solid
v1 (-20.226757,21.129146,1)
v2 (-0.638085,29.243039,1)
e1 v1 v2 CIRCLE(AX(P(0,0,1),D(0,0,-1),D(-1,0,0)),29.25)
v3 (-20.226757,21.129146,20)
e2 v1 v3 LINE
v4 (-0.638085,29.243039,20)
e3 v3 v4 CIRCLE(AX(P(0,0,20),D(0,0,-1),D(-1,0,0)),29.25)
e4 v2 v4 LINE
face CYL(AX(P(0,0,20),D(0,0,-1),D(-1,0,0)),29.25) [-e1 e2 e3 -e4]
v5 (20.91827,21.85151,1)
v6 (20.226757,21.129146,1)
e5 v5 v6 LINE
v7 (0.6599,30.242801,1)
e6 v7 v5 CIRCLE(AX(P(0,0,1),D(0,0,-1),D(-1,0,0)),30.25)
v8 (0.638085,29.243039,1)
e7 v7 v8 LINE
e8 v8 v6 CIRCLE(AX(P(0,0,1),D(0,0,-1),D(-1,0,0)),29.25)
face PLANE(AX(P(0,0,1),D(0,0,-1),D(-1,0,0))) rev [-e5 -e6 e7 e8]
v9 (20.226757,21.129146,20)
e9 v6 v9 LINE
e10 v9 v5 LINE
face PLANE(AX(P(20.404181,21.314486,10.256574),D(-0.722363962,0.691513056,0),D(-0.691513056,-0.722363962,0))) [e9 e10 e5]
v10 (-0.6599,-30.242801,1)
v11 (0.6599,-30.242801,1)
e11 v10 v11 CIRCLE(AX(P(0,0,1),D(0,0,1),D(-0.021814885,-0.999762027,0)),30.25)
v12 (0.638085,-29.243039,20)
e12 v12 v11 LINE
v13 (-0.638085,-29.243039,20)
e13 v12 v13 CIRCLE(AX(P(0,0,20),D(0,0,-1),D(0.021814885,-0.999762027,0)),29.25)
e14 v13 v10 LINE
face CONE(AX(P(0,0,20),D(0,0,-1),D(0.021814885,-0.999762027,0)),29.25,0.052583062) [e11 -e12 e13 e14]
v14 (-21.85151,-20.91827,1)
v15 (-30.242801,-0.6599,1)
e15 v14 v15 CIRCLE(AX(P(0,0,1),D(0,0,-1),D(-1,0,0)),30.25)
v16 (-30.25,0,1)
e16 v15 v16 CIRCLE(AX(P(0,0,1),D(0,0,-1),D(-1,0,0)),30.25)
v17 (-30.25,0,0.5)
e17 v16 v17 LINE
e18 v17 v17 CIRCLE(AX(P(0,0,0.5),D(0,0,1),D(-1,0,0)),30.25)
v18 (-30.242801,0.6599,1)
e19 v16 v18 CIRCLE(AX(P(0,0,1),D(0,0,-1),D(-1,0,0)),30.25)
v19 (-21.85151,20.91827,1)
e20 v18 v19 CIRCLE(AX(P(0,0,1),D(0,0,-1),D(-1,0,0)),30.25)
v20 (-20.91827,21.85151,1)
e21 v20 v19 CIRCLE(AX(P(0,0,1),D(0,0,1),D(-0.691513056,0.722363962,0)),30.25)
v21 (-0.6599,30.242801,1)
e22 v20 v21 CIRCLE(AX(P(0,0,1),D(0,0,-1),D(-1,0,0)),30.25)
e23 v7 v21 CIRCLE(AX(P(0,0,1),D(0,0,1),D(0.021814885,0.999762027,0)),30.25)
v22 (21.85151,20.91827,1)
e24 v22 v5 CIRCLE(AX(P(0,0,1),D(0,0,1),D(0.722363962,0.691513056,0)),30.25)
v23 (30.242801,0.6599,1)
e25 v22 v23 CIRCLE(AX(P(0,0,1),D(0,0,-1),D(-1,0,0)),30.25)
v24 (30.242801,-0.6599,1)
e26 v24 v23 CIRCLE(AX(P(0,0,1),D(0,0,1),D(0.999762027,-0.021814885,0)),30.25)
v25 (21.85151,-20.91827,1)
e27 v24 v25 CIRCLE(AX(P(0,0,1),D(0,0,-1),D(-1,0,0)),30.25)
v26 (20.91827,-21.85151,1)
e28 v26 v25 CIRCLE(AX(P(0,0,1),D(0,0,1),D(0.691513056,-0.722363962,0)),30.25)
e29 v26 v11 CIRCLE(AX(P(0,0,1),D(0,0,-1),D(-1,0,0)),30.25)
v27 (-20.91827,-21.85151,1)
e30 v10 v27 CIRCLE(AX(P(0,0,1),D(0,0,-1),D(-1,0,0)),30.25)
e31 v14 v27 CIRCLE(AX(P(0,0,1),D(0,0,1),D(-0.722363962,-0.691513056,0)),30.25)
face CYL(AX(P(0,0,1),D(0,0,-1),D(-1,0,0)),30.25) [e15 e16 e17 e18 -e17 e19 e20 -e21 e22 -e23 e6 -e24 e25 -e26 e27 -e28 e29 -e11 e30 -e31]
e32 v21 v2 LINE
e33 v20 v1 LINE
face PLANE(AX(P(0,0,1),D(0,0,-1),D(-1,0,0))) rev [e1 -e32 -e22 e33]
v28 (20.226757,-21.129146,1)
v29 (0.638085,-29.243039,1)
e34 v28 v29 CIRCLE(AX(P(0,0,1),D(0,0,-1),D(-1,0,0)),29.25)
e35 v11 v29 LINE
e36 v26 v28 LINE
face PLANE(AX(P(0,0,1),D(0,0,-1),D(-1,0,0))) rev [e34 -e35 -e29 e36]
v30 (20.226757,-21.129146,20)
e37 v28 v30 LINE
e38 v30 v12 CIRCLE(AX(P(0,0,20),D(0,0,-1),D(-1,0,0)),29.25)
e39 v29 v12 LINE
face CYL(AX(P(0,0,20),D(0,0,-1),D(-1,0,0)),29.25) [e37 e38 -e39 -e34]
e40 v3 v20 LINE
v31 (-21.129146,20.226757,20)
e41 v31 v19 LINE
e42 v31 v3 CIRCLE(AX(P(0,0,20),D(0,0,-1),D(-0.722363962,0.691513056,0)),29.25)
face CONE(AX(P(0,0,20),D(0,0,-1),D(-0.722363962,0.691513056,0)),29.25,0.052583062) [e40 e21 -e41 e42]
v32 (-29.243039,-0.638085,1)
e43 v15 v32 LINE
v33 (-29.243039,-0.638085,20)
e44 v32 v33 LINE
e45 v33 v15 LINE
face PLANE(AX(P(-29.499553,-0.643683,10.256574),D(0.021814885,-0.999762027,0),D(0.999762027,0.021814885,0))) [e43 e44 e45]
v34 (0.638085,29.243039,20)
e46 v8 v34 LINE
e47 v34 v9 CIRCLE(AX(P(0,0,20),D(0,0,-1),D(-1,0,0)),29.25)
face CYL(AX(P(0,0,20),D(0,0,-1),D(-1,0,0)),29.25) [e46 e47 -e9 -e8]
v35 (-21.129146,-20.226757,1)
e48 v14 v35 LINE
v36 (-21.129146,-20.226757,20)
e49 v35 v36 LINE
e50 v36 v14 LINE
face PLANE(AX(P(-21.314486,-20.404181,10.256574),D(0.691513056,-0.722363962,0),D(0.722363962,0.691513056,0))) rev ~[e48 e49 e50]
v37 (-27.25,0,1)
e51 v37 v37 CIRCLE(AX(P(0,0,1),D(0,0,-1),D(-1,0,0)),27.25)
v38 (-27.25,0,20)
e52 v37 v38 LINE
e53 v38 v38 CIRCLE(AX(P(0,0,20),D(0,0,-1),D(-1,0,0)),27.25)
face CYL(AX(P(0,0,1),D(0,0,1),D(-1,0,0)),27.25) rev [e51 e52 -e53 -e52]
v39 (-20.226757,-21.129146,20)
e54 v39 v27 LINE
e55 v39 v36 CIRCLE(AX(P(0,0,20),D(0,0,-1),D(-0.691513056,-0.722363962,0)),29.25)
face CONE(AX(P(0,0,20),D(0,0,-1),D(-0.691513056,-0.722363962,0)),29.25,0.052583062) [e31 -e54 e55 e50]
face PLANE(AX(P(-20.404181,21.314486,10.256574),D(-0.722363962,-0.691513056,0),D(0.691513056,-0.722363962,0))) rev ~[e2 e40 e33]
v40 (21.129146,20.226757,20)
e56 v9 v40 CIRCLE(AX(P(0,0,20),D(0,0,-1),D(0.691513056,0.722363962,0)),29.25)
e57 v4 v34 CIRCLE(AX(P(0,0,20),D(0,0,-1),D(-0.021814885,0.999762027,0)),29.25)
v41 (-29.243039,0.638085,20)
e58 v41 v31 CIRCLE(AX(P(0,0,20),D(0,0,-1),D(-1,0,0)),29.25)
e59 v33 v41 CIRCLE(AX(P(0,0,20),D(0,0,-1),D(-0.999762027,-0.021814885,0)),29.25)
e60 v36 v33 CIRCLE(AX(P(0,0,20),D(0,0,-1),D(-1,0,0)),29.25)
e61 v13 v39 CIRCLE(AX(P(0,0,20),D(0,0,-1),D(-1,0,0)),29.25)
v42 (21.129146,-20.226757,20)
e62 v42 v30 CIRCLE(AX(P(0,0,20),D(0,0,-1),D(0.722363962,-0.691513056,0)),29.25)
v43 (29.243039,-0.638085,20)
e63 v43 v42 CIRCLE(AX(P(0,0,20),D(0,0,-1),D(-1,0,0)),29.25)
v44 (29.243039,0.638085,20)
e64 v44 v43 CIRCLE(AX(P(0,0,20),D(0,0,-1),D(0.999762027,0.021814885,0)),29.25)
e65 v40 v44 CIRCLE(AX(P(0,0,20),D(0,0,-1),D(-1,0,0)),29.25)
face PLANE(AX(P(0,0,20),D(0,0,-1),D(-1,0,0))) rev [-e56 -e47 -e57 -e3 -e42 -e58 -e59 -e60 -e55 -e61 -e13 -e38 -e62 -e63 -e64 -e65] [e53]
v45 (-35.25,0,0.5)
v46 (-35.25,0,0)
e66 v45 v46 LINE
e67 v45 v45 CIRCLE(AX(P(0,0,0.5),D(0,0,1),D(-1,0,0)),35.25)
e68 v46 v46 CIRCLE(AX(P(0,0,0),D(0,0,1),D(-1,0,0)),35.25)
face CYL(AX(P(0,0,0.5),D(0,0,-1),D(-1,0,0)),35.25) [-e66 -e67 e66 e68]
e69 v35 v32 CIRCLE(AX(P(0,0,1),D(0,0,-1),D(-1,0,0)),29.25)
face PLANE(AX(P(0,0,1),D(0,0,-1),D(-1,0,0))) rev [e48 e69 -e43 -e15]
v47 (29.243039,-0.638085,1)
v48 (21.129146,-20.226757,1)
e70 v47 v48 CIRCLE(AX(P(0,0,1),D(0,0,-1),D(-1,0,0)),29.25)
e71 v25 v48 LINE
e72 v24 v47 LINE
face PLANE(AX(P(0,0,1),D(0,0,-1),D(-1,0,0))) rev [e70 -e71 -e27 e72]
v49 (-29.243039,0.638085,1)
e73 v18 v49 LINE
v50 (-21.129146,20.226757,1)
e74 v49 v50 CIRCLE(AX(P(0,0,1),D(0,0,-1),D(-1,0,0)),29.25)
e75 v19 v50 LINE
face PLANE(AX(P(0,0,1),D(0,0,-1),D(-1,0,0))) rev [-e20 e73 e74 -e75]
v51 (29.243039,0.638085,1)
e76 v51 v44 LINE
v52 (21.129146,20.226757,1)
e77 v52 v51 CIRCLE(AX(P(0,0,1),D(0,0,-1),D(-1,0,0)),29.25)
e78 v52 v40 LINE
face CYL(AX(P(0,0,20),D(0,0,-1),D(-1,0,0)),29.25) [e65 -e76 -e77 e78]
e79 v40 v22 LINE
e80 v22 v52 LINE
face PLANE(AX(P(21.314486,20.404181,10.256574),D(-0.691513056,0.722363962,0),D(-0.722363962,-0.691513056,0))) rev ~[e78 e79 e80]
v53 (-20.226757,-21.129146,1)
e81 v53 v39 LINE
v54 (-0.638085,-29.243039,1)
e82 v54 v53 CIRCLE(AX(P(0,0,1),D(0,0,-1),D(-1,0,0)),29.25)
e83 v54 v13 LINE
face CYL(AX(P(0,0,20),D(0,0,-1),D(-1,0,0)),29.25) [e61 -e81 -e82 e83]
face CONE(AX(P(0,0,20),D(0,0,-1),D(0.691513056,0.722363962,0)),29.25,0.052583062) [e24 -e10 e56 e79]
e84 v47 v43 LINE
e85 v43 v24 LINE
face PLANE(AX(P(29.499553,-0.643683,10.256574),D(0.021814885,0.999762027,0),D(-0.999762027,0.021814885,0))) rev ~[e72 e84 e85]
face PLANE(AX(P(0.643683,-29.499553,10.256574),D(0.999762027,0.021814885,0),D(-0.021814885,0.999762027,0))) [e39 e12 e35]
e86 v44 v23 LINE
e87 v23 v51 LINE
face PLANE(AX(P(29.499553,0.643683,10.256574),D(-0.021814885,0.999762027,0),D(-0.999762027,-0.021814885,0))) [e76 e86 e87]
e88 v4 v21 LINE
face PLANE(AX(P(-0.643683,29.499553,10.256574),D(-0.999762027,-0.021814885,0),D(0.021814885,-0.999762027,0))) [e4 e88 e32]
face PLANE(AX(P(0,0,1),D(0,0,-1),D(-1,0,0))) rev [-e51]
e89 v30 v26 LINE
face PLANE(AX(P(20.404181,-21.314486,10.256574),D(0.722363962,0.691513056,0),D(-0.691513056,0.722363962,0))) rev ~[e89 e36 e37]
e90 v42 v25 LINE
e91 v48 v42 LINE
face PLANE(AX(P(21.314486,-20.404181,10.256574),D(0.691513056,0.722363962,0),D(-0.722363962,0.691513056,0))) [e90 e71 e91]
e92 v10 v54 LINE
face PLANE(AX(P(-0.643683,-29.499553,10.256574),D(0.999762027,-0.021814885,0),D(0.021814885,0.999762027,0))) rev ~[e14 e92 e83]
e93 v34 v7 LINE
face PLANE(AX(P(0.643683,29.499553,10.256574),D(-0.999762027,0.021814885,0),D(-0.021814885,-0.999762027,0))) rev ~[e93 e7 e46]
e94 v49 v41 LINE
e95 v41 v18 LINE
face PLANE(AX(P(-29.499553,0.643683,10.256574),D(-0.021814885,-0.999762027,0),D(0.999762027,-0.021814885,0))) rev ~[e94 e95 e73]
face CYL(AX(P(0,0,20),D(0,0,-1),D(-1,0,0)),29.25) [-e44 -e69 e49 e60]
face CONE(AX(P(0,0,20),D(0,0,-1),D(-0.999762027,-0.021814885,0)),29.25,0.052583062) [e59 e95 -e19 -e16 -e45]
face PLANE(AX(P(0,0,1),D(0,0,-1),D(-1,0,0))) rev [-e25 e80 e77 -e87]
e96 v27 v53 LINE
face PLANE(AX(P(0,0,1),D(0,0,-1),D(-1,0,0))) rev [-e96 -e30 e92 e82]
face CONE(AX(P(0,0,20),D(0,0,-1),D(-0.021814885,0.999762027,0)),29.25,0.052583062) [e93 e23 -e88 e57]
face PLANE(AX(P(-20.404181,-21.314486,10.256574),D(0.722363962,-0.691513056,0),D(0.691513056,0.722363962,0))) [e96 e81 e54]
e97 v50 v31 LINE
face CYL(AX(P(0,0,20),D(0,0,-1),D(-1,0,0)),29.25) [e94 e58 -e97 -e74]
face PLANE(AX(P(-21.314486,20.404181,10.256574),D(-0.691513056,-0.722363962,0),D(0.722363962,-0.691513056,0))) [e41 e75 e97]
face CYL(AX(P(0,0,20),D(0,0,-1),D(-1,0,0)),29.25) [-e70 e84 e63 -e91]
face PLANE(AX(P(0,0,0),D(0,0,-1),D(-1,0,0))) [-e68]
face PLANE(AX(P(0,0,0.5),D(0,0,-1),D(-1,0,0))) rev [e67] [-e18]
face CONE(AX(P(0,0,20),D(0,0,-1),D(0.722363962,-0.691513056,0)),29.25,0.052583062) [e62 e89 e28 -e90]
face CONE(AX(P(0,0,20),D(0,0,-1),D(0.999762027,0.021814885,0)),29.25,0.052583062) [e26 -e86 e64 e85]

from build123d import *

# Parameters (mm, degrees)
F2_ANGLE_BACK = 1.25
F2_ANGLE      = 2.5
F3_COUNT      = 8


# Not quite as in the source:
# - a feature names something its author has since deleted; it is built from what else it names


with BuildPart() as f1:
    # F0 (on Front) → F1 (revolve)
    with BuildSketch(Plane.XZ):
        Polygon((0, 0.5), (-30.25, 0.5), (-35.25, 0.5), (-35.25, 0), (0, 0), align=None)
        Polygon((-29.25, 1), (-30.25, 1), (-30.25, 0.5), (0, 0.5), (0, 1), (-27.25, 1), (-27.25, 20), (-29.25, 20), align=None)
    revolve(axis=Axis((0, 0, 0.5), (0, 0, -1)))

    # F0 (on Front) → F2 (revolve)
    with BuildSketch(Plane.XZ, mode=Mode.PRIVATE) as f2_sk:
        Polygon((-29.25, 20), (-30.25, 1), (-29.25, 1), align=None)
    revolve(f2_sk.sketch.rotate(Axis((0, 0, 0.5), (0, 0, -1)), -F2_ANGLE_BACK), axis=Axis((0, 0, 0.5), (0, 0, -1)), revolution_arc=F2_ANGLE)

    # F3: F1 ×8 about axis
    f3_axis = Axis((0, 0, 0.5), (0, 0, -1))


with BuildPart() as f1_1:
    add(f1.part)
    for i in range(1, F3_COUNT):
        add(f1.part.rotate(f3_axis, i * 360 / F3_COUNT))


solid = f1_1.part
